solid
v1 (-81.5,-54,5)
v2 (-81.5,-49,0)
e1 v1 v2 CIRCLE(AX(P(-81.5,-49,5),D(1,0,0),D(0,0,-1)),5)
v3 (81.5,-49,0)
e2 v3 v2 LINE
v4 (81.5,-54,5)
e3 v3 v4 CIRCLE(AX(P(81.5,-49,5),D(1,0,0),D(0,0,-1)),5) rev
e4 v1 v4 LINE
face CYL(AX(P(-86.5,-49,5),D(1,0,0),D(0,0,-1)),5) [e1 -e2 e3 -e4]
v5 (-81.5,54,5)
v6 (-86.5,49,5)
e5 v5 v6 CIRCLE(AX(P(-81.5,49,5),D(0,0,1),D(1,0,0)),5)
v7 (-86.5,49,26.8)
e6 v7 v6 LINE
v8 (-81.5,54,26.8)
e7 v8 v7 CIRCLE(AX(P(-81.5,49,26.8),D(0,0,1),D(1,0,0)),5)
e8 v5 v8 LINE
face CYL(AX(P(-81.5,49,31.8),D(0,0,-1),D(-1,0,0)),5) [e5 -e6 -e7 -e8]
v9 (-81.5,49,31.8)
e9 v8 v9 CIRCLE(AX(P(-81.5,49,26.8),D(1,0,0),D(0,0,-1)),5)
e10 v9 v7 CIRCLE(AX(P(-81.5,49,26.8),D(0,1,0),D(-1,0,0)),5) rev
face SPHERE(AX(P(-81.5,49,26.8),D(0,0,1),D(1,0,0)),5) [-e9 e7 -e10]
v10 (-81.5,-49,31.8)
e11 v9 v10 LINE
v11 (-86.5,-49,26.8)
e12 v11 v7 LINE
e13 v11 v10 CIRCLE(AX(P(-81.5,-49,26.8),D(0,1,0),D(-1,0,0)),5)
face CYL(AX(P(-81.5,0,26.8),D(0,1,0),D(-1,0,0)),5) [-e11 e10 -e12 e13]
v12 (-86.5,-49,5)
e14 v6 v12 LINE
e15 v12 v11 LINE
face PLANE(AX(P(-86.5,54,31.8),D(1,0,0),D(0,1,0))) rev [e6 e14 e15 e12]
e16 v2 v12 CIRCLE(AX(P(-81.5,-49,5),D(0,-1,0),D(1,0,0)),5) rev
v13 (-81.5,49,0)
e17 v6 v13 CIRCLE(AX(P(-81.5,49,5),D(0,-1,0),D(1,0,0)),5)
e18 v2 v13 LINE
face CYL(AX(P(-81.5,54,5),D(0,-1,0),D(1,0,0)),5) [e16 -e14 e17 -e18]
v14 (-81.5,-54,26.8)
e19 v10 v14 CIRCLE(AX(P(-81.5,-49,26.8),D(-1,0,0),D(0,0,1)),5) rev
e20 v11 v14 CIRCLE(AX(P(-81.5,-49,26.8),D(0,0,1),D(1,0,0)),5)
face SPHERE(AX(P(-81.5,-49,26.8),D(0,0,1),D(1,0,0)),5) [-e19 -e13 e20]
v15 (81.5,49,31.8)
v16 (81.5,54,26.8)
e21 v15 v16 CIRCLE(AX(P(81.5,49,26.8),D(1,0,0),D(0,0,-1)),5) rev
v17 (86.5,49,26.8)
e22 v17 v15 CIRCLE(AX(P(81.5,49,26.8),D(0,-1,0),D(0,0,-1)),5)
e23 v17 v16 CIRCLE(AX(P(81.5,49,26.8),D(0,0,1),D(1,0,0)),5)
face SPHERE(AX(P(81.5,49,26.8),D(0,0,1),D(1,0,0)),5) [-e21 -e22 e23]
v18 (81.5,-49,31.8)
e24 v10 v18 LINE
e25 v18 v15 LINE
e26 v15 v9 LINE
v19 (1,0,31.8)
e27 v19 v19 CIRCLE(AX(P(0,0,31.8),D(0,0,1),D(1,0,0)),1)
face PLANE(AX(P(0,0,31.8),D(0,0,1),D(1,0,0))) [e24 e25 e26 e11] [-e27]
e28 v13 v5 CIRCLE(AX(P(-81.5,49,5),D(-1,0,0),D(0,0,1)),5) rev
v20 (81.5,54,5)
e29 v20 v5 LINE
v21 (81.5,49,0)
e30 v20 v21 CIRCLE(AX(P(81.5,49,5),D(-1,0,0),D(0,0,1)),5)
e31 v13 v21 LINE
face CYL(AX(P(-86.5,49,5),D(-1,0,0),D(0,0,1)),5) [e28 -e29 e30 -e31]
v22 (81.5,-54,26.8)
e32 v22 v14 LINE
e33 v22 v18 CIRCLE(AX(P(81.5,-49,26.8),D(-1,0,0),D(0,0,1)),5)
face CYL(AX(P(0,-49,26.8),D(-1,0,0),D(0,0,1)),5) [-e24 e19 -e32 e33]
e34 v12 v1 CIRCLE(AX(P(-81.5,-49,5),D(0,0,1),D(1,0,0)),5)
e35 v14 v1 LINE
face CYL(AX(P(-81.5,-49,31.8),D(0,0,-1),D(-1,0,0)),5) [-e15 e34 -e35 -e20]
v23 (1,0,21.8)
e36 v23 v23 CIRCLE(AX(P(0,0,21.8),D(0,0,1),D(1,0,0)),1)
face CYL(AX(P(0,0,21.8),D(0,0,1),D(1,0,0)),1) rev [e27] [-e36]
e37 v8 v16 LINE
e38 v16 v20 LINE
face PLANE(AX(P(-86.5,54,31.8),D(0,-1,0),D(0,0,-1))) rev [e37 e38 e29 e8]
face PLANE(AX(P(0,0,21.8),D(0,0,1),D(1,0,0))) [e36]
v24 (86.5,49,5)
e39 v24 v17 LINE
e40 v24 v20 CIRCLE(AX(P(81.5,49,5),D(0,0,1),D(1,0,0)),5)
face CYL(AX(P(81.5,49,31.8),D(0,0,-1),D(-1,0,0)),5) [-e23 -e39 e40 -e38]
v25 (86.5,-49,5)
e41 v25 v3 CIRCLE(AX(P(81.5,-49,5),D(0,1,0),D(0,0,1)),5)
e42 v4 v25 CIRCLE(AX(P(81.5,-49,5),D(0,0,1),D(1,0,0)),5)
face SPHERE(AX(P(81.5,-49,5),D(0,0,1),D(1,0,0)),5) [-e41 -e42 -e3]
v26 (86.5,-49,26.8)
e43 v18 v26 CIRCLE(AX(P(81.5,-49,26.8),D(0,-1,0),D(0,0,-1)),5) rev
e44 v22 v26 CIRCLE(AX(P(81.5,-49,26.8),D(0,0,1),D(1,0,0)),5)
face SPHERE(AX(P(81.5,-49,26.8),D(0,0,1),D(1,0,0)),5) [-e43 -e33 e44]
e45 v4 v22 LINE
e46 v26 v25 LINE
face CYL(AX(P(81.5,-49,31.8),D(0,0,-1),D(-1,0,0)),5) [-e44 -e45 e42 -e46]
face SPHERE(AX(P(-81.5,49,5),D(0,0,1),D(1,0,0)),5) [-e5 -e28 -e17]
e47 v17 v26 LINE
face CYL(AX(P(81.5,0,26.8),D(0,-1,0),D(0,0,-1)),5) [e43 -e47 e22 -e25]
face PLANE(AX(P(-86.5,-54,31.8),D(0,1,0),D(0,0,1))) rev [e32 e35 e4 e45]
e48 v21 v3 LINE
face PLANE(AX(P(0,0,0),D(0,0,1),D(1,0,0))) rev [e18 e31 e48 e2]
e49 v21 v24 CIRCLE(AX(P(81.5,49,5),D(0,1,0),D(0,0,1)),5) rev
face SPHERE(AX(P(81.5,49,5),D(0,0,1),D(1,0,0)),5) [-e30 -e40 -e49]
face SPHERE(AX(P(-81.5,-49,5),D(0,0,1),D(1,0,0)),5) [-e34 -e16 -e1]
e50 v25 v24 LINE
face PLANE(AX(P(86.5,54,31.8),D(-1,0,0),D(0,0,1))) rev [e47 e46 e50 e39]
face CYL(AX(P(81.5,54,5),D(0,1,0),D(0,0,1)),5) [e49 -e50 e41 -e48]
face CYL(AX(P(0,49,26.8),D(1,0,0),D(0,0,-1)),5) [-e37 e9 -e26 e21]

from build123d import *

# Parameters (mm, degrees)
CROQUIS1_W              = 173
CROQUIS1_H              = 108
SALIENTE_EXTRUIR1_DEPTH = 31.8
REDONDEO1_R             = 5
REDONDEO2_R             = 5
REDONDEO3_R             = 5
CROQUIS2_R              = 1
CORTAR_EXTRUIR1_DEPTH   = 10


with BuildPart() as part:
    # Croquis1 → Saliente-Extruir1 (new body)
    with BuildSketch(Plane.XY):
        Rectangle(CROQUIS1_W, CROQUIS1_H)
    extrude(amount=SALIENTE_EXTRUIR1_DEPTH)

    # Redondeo1
    redondeo1_edges = [part.edges().sort_by_distance(p)[0] for p in [
        (-86.5, 0, 31.8),
        (0, -54, 31.8),
        (86.5, 0, 31.8),
        (0, 54, 31.8),
    ]]
    fillet(redondeo1_edges, radius=REDONDEO1_R)

    # Redondeo2
    redondeo2_edges = [part.edges().sort_by_distance(p)[0] for p in [
        (0, -54, 0),
        (-86.5, 0, 0),
        (0, 54, 0),
        (86.5, 0, 0),
    ]]
    fillet(redondeo2_edges, radius=REDONDEO2_R)

    # Redondeo3
    # the kernel refuses this fillet: 5 mm, written as the material it takes off along each edge
    with BuildSketch(Plane(origin=(-81.5, 49, 26.8), x_dir=(-1, 0, 0), z_dir=(0, 1, 0))) as redondeo3_piece_1_section:
        Polygon((0, 0), (REDONDEO3_R, 0), (REDONDEO3_R, REDONDEO3_R), (0, REDONDEO3_R), align=None)
    redondeo3_piece_1 = extrude(amount=REDONDEO3_R, mode=Mode.PRIVATE)
    redondeo3_piece_1 = redondeo3_piece_1 - Plane(origin=(-81.5, 49, 26.8), x_dir=(0.7071067811865475, 0, -0.7071067811865475), z_dir=(0, 1, 0)) * Sphere(REDONDEO3_R, mode=Mode.PRIVATE)
    add(redondeo3_piece_1, mode=Mode.SUBTRACT)
    with BuildSketch(Plane(origin=(81.5, 49, 26.8), x_dir=(1, 0, 0), z_dir=(0, 1, 0))) as redondeo3_piece_2_section:
        Polygon((0, 0), (REDONDEO3_R, 0), (REDONDEO3_R, -REDONDEO3_R), (0, -REDONDEO3_R), align=None)
    redondeo3_piece_2 = extrude(amount=REDONDEO3_R, mode=Mode.PRIVATE)
    redondeo3_piece_2 = redondeo3_piece_2 - Plane(origin=(81.5, 49, 26.8), x_dir=(-0.7071067811865475, 0, -0.7071067811865475), z_dir=(0, 1, 0)) * Sphere(REDONDEO3_R, mode=Mode.PRIVATE)
    add(redondeo3_piece_2, mode=Mode.SUBTRACT)
    with BuildSketch(Plane(origin=(-81.5, -49, 26.8), x_dir=(0, -1, 0), z_dir=(-1, 0, 0))) as redondeo3_piece_3_section:
        Polygon((0, 0), (REDONDEO3_R, 0), (REDONDEO3_R, REDONDEO3_R), (0, REDONDEO3_R), align=None)
    redondeo3_piece_3 = extrude(amount=REDONDEO3_R, mode=Mode.PRIVATE)
    redondeo3_piece_3 = redondeo3_piece_3 - Plane(origin=(-81.5, -49, 26.8), x_dir=(0, 0.7071067811865475, -0.7071067811865475), z_dir=(-1, 0, 0)) * Sphere(REDONDEO3_R, mode=Mode.PRIVATE)
    add(redondeo3_piece_3, mode=Mode.SUBTRACT)
    with BuildSketch(Plane(origin=(81.5, -49, 26.8), x_dir=(0, -1, 0), z_dir=(1, 0, 0))) as redondeo3_piece_4_section:
        Polygon((0, 0), (REDONDEO3_R, 0), (REDONDEO3_R, -REDONDEO3_R), (0, -REDONDEO3_R), align=None)
    redondeo3_piece_4 = extrude(amount=REDONDEO3_R, mode=Mode.PRIVATE)
    redondeo3_piece_4 = redondeo3_piece_4 - Plane(origin=(81.5, -49, 26.8), x_dir=(0, 0.7071067811865475, -0.7071067811865475), z_dir=(1, 0, 0)) * Sphere(REDONDEO3_R, mode=Mode.PRIVATE)
    add(redondeo3_piece_4, mode=Mode.SUBTRACT)
    with BuildSketch(Plane(origin=(81.5, -49, 5), x_dir=(0, -1, 0), z_dir=(1, 0, 0))) as redondeo3_piece_5_section:
        Polygon((0, 0), (REDONDEO3_R, 0), (REDONDEO3_R, REDONDEO3_R), (0, REDONDEO3_R), align=None)
    redondeo3_piece_5 = extrude(amount=REDONDEO3_R, mode=Mode.PRIVATE)
    redondeo3_piece_5 = redondeo3_piece_5 - Plane(origin=(81.5, -49, 5), x_dir=(0, 0.7071067811865475, 0.7071067811865475), z_dir=(1, 0, 0)) * Sphere(REDONDEO3_R, mode=Mode.PRIVATE)
    add(redondeo3_piece_5, mode=Mode.SUBTRACT)
    with BuildSketch(Plane(origin=(-81.5, -49, 5), x_dir=(0, -1, 0), z_dir=(-1, 0, 0))) as redondeo3_piece_6_section:
        Polygon((0, 0), (REDONDEO3_R, 0), (REDONDEO3_R, -REDONDEO3_R), (0, -REDONDEO3_R), align=None)
    redondeo3_piece_6 = extrude(amount=REDONDEO3_R, mode=Mode.PRIVATE)
    redondeo3_piece_6 = redondeo3_piece_6 - Plane(origin=(-81.5, -49, 5), x_dir=(0, 0.7071067811865475, 0.7071067811865475), z_dir=(-1, 0, 0)) * Sphere(REDONDEO3_R, mode=Mode.PRIVATE)
    add(redondeo3_piece_6, mode=Mode.SUBTRACT)
    with BuildSketch(Plane(origin=(81.5, 49, 5), x_dir=(1, 0, 0), z_dir=(0, 1, 0))) as redondeo3_piece_7_section:
        Polygon((0, 0), (REDONDEO3_R, 0), (REDONDEO3_R, REDONDEO3_R), (0, REDONDEO3_R), align=None)
    redondeo3_piece_7 = extrude(amount=REDONDEO3_R, mode=Mode.PRIVATE)
    redondeo3_piece_7 = redondeo3_piece_7 - Plane(origin=(81.5, 49, 5), x_dir=(-0.7071067811865475, 0, 0.7071067811865475), z_dir=(0, 1, 0)) * Sphere(REDONDEO3_R, mode=Mode.PRIVATE)
    add(redondeo3_piece_7, mode=Mode.SUBTRACT)
    with BuildSketch(Plane(origin=(-81.5, 49, 5), x_dir=(-1, 0, 0), z_dir=(0, 1, 0))) as redondeo3_piece_8_section:
        Polygon((0, 0), (REDONDEO3_R, 0), (REDONDEO3_R, -REDONDEO3_R), (0, -REDONDEO3_R), align=None)
    redondeo3_piece_8 = extrude(amount=REDONDEO3_R, mode=Mode.PRIVATE)
    redondeo3_piece_8 = redondeo3_piece_8 - Plane(origin=(-81.5, 49, 5), x_dir=(0.7071067811865475, 0, 0.7071067811865475), z_dir=(0, 1, 0)) * Sphere(REDONDEO3_R, mode=Mode.PRIVATE)
    add(redondeo3_piece_8, mode=Mode.SUBTRACT)
    with BuildSketch(Plane(origin=(86.5, -54, 5), x_dir=(0, 1, 0), z_dir=(0, 0, 1)), Plane(origin=(86.5, 54, 5), x_dir=(-1, 0, 0), z_dir=(0, 0, 1))) as redondeo3_piece_9:
        with BuildLine():
            CenterArc((REDONDEO3_R, REDONDEO3_R), REDONDEO3_R, 180, 90)
            Line((0, REDONDEO3_R), (0, 0))
            Line((0, 0), (REDONDEO3_R, 0))
        make_face()
    extrude(amount=21.8, mode=Mode.SUBTRACT)
    with BuildSketch(Plane(origin=(-86.5, -54, 5), x_dir=(0, 1, 0), z_dir=(0, 0, 1)), Plane(origin=(-86.5, 54, 5), x_dir=(1, 0, 0), z_dir=(0, 0, 1))) as redondeo3_piece_10:
        with BuildLine():
            CenterArc((REDONDEO3_R, -REDONDEO3_R), REDONDEO3_R, 90, 90)
            Line((0, -REDONDEO3_R), (0, 0))
            Line((0, 0), (REDONDEO3_R, 0))
        make_face()
    extrude(amount=21.8, mode=Mode.SUBTRACT)

    # Croquis2 → Cortar-Extruir1 (cut)
    with BuildSketch(Plane.XY.offset(31.8)):
        Circle(CROQUIS2_R)
    extrude(amount=-CORTAR_EXTRUIR1_DEPTH, mode=Mode.SUBTRACT)


solid = part.part
